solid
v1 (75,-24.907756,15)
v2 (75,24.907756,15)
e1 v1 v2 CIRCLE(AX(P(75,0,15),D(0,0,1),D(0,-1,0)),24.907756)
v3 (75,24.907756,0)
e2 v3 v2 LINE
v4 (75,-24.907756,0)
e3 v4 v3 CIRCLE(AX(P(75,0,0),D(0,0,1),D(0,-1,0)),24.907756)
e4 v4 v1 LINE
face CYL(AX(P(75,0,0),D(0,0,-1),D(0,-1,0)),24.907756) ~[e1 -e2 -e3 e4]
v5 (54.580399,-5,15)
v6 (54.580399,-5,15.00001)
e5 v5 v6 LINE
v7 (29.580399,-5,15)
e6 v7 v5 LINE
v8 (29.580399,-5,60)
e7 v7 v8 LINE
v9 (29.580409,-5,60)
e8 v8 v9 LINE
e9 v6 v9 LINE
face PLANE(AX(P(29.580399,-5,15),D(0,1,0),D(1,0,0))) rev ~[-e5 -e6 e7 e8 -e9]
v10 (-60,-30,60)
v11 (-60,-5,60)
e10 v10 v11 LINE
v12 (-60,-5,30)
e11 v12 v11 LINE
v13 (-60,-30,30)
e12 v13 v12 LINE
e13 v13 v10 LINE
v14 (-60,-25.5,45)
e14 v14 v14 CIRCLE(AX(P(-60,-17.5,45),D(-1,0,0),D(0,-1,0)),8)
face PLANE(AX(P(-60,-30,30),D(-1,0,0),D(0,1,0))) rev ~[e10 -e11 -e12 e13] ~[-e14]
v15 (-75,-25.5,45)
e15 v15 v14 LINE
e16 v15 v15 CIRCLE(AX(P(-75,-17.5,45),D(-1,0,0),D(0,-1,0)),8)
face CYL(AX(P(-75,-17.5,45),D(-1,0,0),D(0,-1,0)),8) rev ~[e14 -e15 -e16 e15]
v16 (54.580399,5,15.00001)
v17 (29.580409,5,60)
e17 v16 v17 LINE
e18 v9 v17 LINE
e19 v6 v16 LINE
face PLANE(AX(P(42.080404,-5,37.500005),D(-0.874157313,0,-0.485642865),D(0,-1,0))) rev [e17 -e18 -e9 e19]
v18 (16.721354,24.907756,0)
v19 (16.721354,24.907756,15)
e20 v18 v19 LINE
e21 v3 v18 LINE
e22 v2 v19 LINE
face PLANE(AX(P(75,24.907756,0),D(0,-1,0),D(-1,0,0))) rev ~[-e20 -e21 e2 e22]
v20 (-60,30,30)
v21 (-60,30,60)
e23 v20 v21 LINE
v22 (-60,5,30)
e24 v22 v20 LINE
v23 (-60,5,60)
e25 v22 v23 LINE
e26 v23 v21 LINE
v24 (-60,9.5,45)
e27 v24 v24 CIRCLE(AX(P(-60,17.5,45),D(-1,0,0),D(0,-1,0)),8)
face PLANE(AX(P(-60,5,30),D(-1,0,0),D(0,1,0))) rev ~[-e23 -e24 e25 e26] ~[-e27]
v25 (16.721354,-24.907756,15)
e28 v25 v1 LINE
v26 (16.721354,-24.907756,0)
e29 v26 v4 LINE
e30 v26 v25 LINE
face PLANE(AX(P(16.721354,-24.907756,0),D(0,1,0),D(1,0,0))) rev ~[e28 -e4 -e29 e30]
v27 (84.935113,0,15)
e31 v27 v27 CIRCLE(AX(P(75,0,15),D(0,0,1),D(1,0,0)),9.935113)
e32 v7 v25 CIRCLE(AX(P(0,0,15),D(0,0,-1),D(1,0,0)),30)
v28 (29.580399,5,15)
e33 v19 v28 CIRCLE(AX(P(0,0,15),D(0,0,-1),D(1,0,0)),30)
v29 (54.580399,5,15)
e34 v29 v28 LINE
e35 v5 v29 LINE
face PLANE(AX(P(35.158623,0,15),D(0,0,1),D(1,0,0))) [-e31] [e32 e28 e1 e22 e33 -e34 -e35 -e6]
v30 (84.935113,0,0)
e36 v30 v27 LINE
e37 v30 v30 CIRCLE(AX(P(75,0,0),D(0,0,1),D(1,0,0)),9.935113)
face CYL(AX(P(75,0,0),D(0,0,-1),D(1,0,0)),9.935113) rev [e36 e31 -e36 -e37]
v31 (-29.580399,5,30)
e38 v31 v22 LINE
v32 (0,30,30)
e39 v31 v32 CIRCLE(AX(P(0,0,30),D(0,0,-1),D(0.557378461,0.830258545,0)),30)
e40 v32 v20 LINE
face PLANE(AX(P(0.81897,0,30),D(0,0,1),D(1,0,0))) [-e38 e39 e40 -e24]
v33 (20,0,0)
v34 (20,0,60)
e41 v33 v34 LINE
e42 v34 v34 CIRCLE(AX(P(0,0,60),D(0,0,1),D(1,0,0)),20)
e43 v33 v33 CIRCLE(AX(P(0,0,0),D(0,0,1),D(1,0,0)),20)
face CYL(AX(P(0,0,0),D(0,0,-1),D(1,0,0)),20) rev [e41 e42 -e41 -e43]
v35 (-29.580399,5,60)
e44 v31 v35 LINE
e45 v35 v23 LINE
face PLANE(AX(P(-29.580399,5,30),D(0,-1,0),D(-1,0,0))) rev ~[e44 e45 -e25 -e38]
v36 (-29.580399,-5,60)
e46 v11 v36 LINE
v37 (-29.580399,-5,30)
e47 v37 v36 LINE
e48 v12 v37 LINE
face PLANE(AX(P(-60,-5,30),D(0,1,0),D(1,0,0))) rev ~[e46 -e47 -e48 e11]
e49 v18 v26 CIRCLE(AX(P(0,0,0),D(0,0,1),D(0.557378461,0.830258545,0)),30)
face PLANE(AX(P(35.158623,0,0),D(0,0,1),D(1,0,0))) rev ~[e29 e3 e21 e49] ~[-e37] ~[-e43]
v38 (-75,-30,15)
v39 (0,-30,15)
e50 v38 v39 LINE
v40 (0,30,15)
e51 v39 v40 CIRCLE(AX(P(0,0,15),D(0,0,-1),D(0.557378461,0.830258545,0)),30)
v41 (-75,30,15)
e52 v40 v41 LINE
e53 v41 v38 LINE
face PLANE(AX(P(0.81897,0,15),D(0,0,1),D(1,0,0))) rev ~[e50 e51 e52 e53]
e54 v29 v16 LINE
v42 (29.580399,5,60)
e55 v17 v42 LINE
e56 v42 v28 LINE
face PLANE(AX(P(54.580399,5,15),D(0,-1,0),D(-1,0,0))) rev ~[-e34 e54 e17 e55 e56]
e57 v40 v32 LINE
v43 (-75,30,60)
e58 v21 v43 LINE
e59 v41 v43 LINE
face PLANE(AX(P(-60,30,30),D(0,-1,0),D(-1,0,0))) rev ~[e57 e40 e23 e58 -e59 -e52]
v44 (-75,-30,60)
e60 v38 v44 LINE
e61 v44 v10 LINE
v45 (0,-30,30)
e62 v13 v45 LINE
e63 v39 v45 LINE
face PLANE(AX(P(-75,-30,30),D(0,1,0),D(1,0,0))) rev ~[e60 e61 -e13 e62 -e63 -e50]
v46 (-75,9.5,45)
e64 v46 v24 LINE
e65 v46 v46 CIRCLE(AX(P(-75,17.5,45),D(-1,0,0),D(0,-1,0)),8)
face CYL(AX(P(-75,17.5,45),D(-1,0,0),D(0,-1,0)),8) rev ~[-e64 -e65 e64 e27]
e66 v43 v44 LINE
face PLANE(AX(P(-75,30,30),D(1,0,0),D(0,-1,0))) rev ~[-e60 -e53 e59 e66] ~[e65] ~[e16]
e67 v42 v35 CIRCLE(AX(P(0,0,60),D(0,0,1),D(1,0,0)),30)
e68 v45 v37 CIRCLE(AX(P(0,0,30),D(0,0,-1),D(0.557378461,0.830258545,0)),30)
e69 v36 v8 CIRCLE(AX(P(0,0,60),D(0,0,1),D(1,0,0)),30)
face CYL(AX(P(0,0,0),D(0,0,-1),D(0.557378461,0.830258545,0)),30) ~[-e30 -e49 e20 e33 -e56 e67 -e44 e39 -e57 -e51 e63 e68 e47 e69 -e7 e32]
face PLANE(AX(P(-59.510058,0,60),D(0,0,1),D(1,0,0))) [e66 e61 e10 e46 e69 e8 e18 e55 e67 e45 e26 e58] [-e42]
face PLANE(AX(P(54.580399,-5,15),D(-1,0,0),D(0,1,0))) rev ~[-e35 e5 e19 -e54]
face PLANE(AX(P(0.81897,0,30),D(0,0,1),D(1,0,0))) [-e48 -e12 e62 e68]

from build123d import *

# Parameters (mm, degrees)
F0_R      = 30
F0_R_2    = 20
F1_DEPTH  = 60
F2_R      = 20
F2_R_2    = 9.9351128524
F3_DEPTH  = 15
F5_DEPTH  = 45
F6_SIZE2  = 24.99999
F6_SIZE   = 44.99999
F7_R      = 20
F8_DEPTH  = 15
F10_DEPTH = 30
F11_R     = 8
F12_DEPTH = 15


# Not quite as in the source:
# - a fillet or chamfer is up to 0.001 mm smaller than in the source, because OpenCascade refuses the exact size


with BuildPart() as f1:
    # F0 (on Top) → F1 (new body)
    with BuildSketch(Plane.XY):
        Circle(F0_R)
        Circle(F0_R_2, mode=Mode.SUBTRACT)
    extrude(amount=F1_DEPTH)

    # F2 (on Top) → F3 (join)
    with BuildSketch(Plane.XY):
        with BuildLine():
            Line((16.7213538347, -24.9077563409), (75, -24.9077563409))
            ThreePointArc((75, -24.9077563409), (99.9077563409, 0), (75, 24.9077563409))
            Line((75, 24.9077563409), (16.7213538347, 24.9077563409))
            ThreePointArc((16.7213538347, 24.9077563409), (-30, 0), (16.7213538347, -24.9077563409))
        make_face()
        Circle(F2_R, mode=Mode.SUBTRACT)
        with Locations((75, 0)):
            Circle(F2_R_2, mode=Mode.SUBTRACT)
    extrude(amount=F3_DEPTH)

    # F4 (on face) → F5 (join, through all)
    with BuildSketch(Plane.XY.offset(15)):
        with BuildLine():
            Line((54.5803989155, 5), (29.5803989155, 5))
            ThreePointArc((29.5803989155, 5), (30, 0), (29.5803989155, -5))
            Line((29.5803989155, -5), (54.5803989155, -5))
            Line((54.5803989155, -5), (54.5803989155, 5))
        make_face()
    extrude(amount=F5_DEPTH)

    # F6 (size 45 and 25 in the source; OpenCascade refuses exactly that, so slightly less here)
    f6_edges = [f1.edges().sort_by_distance(p)[0] for p in [
        (54.580399, 0, 60),
    ]]
    f6_side = f1.faces().sort_by_distance((54.580399, 0, 37.5))[0]
    chamfer(f6_edges, length=F6_SIZE, length2=F6_SIZE2, reference=f6_side)

    # F7 (on face) → F8 (join)
    with BuildSketch(Plane.XY.offset(15)):
        with BuildLine():
            Line((29.5803989155, -5), (29.5803989155, 5))
            ThreePointArc((29.5803989155, 5), (19.364916731, 22.9128784748), (0, 30))
            ThreePointArc((0, 30), (-30, 0), (0, -30))
            ThreePointArc((0, -30), (19.364916731, -22.9128784748), (29.5803989155, -5))
        make_face()
        Circle(F7_R, mode=Mode.SUBTRACT)
        with BuildLine():
            ThreePointArc((0, -30), (-30, 0), (0, 30))
            Line((0, 30), (-75, 30))
            Line((-75, 30), (-75, -30))
            Line((-75, -30), (0, -30))
        make_face()
    extrude(amount=F8_DEPTH)

    # F9 (on face) → F10 (join, through all)
    with BuildSketch(Plane.XY.offset(30)):
        with BuildLine():
            Line((-60, 30), (-75, 30))
            Line((-75, 30), (-75, -30))
            Line((-75, -30), (-60, -30))
            Line((-60, -30), (-60, -5))
            Line((-60, -5), (-29.5803989155, -5))
            ThreePointArc((-29.5803989155, -5), (-30, 0), (-29.5803989155, 5))
            Line((-29.5803989155, 5), (-60, 5))
            Line((-60, 5), (-60, 30))
        make_face()
    extrude(amount=F10_DEPTH)

    # F11 (on face) → F12 (cut, through all)
    with BuildSketch(Plane(origin=(-75, 0, 0), x_dir=(0, -1, 0), z_dir=(-1, 0, 0))):
        with Locations((17.5, 45)):
            Circle(F11_R)
        with Locations((-17.5, 45)):
            Circle(F11_R)
    extrude(amount=-F12_DEPTH, mode=Mode.SUBTRACT)


solid = f1.part
